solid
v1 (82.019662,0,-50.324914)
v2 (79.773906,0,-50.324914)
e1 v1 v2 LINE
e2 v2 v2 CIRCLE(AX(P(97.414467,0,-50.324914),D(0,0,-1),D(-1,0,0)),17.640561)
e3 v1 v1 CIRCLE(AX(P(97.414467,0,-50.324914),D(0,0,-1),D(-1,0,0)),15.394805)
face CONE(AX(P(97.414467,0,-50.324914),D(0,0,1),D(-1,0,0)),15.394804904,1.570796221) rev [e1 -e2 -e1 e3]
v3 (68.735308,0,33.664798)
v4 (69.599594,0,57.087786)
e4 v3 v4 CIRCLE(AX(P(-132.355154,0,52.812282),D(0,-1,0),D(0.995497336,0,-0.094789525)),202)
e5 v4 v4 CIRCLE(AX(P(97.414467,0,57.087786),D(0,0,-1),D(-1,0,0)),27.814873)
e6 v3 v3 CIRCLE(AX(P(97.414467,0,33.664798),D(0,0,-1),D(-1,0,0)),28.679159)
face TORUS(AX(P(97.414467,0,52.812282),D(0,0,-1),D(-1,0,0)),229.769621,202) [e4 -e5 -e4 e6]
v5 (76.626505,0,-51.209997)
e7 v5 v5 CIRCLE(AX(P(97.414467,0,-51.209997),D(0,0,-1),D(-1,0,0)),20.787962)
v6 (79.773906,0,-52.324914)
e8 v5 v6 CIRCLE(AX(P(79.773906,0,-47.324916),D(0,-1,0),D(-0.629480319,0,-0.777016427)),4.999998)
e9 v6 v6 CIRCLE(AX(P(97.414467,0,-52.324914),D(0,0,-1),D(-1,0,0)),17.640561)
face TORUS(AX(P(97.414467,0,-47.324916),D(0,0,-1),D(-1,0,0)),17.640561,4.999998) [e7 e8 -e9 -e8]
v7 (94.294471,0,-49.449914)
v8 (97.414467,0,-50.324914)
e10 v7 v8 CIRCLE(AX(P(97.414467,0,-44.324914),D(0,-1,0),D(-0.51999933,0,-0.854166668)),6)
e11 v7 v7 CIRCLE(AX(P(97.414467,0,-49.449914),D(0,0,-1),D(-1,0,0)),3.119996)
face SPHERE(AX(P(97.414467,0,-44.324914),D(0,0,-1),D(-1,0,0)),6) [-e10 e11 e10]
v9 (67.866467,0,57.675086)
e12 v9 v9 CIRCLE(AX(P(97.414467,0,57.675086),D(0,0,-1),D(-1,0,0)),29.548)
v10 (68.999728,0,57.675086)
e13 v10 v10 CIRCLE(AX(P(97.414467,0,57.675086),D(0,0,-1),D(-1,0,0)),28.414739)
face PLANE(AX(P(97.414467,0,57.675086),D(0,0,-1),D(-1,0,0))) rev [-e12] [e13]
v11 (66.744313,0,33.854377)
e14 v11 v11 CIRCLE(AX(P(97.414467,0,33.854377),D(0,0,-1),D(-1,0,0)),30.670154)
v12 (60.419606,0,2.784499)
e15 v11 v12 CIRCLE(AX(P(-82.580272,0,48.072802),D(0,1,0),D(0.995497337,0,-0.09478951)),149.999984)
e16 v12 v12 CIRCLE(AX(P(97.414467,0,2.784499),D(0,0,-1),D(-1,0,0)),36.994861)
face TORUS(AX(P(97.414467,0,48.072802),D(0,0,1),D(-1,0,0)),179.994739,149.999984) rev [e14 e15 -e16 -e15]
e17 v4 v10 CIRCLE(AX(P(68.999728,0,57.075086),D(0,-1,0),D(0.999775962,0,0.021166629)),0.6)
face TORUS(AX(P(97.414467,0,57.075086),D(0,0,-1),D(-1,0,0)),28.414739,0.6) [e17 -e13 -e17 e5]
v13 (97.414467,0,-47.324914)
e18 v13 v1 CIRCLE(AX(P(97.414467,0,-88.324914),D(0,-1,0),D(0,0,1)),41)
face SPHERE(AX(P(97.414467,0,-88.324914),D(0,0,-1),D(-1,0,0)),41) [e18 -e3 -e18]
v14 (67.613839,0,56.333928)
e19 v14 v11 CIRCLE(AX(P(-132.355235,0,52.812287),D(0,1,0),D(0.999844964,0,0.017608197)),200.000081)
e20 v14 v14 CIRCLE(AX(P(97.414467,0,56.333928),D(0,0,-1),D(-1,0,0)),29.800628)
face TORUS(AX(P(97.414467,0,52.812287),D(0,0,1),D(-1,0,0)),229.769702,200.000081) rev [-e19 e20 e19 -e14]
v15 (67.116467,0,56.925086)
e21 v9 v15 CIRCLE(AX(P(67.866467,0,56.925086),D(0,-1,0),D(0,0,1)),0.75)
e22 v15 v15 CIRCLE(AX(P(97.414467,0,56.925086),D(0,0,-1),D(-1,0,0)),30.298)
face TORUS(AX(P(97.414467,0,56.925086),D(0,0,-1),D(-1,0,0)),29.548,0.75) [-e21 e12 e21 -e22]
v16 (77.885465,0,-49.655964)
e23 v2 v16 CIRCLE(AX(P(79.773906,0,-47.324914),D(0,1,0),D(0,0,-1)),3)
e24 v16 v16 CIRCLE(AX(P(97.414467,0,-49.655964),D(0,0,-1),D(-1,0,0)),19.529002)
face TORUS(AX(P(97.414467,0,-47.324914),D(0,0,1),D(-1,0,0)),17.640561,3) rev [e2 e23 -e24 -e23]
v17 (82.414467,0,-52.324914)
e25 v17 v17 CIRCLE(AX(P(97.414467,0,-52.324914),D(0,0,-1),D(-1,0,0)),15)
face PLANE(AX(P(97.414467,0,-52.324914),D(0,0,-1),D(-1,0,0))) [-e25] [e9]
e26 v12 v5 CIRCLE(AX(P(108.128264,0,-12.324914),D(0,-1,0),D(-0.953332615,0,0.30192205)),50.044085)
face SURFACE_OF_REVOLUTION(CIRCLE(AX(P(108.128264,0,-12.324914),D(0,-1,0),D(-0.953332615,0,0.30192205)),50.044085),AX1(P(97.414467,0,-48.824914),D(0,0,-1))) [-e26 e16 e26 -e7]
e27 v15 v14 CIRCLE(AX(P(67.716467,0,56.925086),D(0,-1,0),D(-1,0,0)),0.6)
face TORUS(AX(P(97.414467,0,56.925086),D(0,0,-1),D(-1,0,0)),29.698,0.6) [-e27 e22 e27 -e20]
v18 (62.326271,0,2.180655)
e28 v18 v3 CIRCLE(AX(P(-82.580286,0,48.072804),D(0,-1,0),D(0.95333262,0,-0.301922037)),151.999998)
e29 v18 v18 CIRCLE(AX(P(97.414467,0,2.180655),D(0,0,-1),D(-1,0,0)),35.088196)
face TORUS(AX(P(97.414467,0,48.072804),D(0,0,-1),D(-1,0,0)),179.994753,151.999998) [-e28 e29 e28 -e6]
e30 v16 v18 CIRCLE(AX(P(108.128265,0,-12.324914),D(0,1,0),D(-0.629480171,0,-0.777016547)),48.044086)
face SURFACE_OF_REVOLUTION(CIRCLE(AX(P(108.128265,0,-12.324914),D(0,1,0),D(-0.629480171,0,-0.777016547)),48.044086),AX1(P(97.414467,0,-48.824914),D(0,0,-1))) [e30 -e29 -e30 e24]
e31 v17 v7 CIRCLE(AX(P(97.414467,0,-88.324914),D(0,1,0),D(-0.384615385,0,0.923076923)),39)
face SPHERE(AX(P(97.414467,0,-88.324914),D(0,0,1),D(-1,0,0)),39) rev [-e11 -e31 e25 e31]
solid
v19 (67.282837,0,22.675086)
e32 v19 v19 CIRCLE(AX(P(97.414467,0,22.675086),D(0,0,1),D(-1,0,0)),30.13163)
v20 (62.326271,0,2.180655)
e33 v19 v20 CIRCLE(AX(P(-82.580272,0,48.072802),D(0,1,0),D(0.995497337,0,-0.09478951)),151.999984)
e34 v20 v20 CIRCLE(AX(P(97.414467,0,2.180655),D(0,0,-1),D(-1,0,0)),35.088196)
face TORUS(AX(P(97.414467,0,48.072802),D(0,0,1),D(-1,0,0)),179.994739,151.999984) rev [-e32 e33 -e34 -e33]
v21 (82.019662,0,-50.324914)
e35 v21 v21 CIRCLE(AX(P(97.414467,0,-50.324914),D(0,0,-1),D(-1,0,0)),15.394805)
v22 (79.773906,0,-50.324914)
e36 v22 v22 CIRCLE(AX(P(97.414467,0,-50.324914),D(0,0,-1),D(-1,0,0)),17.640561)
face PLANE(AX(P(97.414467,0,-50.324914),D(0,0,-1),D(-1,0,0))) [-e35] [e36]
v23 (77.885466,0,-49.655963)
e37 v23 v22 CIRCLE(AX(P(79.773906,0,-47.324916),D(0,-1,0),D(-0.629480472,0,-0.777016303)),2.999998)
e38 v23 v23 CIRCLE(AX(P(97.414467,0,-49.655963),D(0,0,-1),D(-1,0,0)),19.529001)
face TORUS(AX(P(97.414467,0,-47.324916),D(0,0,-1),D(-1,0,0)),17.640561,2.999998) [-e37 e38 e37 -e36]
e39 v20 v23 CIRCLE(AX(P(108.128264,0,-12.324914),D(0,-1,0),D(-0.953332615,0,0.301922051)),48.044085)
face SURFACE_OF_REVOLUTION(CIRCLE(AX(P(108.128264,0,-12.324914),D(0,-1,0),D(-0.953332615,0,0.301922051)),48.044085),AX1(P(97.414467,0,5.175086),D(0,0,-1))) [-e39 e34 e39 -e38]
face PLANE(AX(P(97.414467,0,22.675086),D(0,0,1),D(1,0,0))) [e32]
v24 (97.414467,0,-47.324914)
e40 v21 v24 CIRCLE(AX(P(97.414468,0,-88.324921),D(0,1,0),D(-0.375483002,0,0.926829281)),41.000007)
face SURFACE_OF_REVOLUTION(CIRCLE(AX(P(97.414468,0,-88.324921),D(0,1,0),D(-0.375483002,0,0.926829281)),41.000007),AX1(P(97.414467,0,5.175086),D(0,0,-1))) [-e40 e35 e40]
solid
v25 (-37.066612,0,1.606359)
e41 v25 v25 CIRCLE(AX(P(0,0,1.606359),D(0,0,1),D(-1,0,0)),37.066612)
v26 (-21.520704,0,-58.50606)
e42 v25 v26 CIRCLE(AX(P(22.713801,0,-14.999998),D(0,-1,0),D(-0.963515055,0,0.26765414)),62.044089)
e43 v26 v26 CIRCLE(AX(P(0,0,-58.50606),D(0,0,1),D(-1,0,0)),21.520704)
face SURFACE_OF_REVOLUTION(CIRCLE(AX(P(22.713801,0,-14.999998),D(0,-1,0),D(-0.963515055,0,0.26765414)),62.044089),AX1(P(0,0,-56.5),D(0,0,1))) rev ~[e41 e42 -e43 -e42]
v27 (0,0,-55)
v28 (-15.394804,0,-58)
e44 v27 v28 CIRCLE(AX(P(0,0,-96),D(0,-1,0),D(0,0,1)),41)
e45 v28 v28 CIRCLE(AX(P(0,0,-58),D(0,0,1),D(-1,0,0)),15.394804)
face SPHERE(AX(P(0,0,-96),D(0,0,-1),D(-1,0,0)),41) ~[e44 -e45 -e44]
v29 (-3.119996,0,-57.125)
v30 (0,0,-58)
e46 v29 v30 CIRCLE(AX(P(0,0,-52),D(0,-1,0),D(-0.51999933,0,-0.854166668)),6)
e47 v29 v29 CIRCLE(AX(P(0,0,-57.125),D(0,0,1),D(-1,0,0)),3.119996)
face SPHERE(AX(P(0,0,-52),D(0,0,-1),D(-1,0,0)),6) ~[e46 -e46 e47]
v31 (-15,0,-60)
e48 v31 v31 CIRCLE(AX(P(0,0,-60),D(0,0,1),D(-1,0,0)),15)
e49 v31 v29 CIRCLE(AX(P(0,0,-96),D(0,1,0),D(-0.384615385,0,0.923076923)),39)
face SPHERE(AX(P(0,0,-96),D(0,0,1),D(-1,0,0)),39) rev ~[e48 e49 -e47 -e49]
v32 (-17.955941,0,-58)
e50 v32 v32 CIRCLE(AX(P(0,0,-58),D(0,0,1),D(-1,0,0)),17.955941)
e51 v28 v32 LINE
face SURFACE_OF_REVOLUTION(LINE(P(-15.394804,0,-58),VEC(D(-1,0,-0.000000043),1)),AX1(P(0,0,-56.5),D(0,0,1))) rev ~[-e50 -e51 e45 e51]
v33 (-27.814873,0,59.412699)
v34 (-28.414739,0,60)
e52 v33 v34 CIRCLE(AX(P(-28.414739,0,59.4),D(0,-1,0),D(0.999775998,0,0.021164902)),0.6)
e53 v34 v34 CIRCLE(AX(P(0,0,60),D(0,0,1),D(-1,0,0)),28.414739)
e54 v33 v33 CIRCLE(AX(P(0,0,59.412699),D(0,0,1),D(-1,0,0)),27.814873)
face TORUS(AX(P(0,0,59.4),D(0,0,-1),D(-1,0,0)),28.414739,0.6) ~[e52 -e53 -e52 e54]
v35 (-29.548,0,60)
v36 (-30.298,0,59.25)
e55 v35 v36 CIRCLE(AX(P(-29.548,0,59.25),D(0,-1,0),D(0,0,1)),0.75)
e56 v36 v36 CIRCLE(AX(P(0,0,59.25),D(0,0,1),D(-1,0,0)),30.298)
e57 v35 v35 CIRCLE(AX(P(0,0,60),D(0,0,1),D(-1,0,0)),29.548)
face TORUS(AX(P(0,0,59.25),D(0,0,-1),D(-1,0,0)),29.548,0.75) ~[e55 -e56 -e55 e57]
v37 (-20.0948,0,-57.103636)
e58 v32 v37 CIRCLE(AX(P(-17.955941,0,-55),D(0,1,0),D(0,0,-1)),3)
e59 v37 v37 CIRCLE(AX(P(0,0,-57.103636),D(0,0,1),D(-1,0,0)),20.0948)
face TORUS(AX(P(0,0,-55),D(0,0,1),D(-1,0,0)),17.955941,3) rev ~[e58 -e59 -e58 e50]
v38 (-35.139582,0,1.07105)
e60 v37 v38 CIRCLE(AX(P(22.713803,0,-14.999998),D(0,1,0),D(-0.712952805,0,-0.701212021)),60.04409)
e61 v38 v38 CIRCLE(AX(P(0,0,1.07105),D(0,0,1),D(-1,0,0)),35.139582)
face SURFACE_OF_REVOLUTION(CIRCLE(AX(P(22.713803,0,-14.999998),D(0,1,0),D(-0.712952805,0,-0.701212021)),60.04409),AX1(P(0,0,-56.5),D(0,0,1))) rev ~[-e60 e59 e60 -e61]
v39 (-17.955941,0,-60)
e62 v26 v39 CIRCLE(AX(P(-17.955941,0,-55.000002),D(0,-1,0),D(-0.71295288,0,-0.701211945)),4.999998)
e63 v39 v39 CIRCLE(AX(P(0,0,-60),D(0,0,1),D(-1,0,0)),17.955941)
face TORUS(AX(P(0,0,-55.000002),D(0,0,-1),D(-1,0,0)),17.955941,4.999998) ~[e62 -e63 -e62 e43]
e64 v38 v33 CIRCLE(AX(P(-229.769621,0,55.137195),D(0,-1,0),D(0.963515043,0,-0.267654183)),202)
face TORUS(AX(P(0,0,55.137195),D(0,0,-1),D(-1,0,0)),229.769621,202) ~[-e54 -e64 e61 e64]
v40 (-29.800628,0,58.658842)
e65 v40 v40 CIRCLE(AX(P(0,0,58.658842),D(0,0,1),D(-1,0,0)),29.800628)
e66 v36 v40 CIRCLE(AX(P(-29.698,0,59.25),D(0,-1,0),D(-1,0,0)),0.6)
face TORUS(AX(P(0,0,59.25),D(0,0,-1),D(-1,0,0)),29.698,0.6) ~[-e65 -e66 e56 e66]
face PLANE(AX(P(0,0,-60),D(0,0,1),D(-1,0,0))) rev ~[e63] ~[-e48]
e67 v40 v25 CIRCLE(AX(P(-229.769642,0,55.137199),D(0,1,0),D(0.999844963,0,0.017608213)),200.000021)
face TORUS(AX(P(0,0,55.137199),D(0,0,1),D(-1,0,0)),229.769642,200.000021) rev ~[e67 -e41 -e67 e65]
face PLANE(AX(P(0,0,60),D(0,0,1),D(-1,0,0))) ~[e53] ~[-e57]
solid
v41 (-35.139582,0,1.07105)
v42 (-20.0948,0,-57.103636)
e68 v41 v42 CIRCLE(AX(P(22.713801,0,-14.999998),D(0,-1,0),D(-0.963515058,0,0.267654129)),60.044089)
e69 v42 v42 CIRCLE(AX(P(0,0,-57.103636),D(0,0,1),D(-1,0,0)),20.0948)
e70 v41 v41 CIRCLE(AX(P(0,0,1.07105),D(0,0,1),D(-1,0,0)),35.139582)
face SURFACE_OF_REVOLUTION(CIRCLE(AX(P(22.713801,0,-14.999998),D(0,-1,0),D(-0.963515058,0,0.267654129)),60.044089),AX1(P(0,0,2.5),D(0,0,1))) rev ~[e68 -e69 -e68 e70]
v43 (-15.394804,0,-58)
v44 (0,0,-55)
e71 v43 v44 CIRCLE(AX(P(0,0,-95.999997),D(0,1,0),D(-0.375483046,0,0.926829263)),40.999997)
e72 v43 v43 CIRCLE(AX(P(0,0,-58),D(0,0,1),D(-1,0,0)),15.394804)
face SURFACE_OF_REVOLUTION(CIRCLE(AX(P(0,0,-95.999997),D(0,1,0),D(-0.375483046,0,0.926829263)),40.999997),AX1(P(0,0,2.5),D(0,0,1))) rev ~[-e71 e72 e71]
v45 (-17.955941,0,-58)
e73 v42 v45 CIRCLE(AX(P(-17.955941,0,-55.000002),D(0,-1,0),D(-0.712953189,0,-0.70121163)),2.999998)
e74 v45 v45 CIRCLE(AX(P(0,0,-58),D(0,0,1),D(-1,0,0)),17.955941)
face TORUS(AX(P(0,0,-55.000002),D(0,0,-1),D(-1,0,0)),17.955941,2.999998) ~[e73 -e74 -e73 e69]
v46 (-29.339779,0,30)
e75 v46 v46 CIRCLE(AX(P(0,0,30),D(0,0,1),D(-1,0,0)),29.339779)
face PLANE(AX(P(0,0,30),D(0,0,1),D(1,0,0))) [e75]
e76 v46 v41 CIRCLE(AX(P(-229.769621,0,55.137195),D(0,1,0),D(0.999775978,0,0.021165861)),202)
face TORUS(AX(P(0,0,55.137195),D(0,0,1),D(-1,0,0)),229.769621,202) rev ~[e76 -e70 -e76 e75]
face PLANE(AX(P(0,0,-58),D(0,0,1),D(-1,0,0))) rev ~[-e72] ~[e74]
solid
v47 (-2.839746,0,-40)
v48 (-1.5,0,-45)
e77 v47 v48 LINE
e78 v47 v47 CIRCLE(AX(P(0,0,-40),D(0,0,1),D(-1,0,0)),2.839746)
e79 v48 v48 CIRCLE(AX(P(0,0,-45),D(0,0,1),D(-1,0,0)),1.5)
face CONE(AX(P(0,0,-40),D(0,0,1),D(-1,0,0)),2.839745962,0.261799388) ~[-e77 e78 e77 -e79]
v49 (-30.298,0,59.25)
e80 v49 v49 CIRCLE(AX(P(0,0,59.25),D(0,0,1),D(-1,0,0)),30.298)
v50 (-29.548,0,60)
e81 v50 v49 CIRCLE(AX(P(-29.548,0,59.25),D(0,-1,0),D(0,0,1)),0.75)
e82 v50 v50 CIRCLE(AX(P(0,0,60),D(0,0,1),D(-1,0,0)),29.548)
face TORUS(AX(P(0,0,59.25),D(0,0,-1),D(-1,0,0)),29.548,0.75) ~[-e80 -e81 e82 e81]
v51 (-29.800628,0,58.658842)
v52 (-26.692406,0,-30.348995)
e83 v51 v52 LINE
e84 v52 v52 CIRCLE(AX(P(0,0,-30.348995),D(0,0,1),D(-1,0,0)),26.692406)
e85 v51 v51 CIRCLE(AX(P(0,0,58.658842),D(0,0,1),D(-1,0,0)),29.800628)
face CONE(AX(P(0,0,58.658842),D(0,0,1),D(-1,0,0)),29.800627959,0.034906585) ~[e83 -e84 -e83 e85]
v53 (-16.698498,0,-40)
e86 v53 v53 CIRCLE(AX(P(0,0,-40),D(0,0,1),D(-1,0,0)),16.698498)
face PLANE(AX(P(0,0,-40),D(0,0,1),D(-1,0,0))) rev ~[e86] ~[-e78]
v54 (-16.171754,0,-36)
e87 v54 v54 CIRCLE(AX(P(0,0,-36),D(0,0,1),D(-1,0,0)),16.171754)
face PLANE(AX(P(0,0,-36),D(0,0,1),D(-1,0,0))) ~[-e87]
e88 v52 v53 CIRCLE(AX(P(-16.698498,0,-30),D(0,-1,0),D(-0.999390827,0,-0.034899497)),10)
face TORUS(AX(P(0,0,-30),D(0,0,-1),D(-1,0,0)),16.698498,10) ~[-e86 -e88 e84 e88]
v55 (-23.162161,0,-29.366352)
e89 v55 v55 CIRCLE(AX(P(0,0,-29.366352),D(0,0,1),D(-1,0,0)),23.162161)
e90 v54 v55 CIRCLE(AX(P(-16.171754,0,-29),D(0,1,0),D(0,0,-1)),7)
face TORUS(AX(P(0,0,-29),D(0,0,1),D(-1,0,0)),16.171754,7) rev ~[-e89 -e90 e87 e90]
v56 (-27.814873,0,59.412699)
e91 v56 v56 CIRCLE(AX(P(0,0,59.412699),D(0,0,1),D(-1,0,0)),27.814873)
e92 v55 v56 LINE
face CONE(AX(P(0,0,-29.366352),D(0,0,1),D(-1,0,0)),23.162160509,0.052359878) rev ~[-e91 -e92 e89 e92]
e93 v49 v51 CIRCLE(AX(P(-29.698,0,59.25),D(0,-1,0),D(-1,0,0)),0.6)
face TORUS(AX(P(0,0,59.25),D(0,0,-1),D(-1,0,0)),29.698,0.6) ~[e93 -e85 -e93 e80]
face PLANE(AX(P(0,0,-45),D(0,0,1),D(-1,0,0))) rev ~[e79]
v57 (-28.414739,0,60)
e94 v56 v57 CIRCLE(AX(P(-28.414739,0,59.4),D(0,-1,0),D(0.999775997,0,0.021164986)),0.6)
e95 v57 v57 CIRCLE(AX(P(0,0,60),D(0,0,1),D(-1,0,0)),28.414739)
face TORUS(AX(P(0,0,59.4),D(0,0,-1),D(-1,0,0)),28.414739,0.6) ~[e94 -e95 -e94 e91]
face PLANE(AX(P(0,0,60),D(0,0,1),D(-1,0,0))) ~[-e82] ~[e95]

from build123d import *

# Parameters (mm, degrees)
F3_R      = 125.9850186155
F4_DEPTH  = 30
F12_R     = 66.2325488452
F13_DEPTH = 35


# Not quite as in the source:
# - ends of sketch curves that miss each other by under 0.0002 mm in the source are joined


with BuildPart() as f2:
    # F1 (on Front) → F2 (revolve)
    with BuildSketch(Plane.XZ):
        with BuildLine():
            ThreePointArc((-27.8148734311, 59.4126989909), (-29.3430504586, 29.9739316777), (-35.1395822774, 1.0710500771))
            ThreePointArc((-35.1395822774, 1.0710500771), (-35.4177932294, -30.0336371057), (-20.0947995033, -57.1036355115))
            ThreePointArc((-20.0947995033, -57.1036355115), (-19.1154867702, -57.7668490394), (-17.955941, -58))
            Line((-17.955941, -58), (-15.394804, -58))
            ThreePointArc((-15.394804, -58), (-7.8421934259, -55.7569881561), (0, -55))
            Line((0, -55), (0, 60))
            Line((0, 60), (-28.414739, 60))
            ThreePointArc((-28.414739, 60), (-27.9949887141, 59.8287303318), (-27.8148734311, 59.4126989909))
        make_face()
    revolve(axis=Axis((0, 0, 2.5), (0, 0, 1)))

    # F3 (on face) → F4 (cut)
    with BuildSketch(Plane.XY.offset(60)):
        Circle(F3_R)
    extrude(amount=-F4_DEPTH, mode=Mode.SUBTRACT)


with BuildPart() as f6:
    # F5 (on Front) → F6 (revolve)
    with BuildSketch(Plane.XZ):
        with BuildLine():
            ThreePointArc((-35.1395822774, 1.0710500771), (-29.3430504586, 29.9739316777), (-27.8148734311, 59.4126989909))
            ThreePointArc((-27.8148734311, 59.4126989909), (-27.9949887141, 59.8287303318), (-28.414739, 60))
            Line((-28.414739, 60), (-29.548, 60))
            ThreePointArc((-29.548, 60), (-30.0783300859, 59.7803300859), (-30.298, 59.25))
            ThreePointArc((-30.298, 59.25), (-30.1571169652, 58.8637208104), (-29.800627959, 58.6588422359))
            ThreePointArc((-29.800627959, 58.6588422359), (-31.3721118802, 29.8700547766), (-37.0666121939, 1.6063590539))
            ThreePointArc((-37.0666121939, 1.6063590539), (-37.3540901939, -30.5343906031), (-21.5207043341, -58.506060345))
            ThreePointArc((-21.5207043341, -58.506060345), (-19.8885166315, -59.611415339), (-17.955941, -60))
            Line((-17.955941, -60), (-15, -60))
            ThreePointArc((-15, -60), (-9.1733292762, -58.0941952995), (-3.119996, -57.1250000005))
            ThreePointArc((-3.119996, -57.1250000005), (-1.6201851772, -57.7771100034), (0, -58))
            Line((0, -58), (0, -55))
            ThreePointArc((0, -55), (-7.8421934259, -55.7569881561), (-15.3948040449, -57.9999998892))
            Line((-15.3948040449, -57.9999998892), (-17.955941, -58))
            ThreePointArc((-17.955941, -58), (-19.1154867702, -57.7668490394), (-20.0947997335, -57.1036357379))
            ThreePointArc((-20.0947997335, -57.1036357379), (-35.4177932294, -30.0336371057), (-35.1395822774, 1.0710500771))
        make_face()
    revolve(axis=Axis((0, 0, -56.5), (0, 0, 1)))


with BuildPart() as f8:
    # F7 (on Front) → F8 (revolve)
    with BuildSketch(Plane.XZ):
        with BuildLine():
            Line((-23.1621605088, -29.3663516937), (-27.814873402, 59.4126989915))
            ThreePointArc((-27.814873402, 59.4126989915), (-27.9949887141, 59.8287303318), (-28.414739, 60))
            Line((-28.414739, 60), (-29.548, 60))
            ThreePointArc((-29.548, 60), (-30.0783300859, 59.7803300859), (-30.298, 59.25))
            ThreePointArc((-30.298, 59.25), (-30.1571169652, 58.8637208104), (-29.800627959, 58.6588422359))
            Line((-29.800627959, 58.6588422359), (-26.6924057931, -30.348994967))
            ThreePointArc((-26.6924057931, -30.348994967), (-23.6450812275, -37.1933980034), (-16.6984975229, -40))
            Line((-16.6984975229, -40), (-2.8397459622, -40))
            Line((-2.8397459622, -40), (-1.5, -45))
            Line((-1.5, -45), (0, -45))
            Line((0, -45), (0, -40))
            Line((0, -40), (0, -36))
            Line((0, -36), (-16.1717537655, -36))
            ThreePointArc((-16.1717537655, -36), (-20.9902357953, -34.0776205971), (-23.1621605088, -29.3663516937))
        make_face()
    revolve(axis=Axis((0, 0, -38), (0, 0, 1)))


with BuildPart() as f11:
    # F10 (on Front) → F11 (revolve)
    with BuildSketch(Plane.XZ):
        with BuildLine():
            ThreePointArc((68.999728, 57.675086), (69.4194779288, 57.5038166816), (69.5995935768, 57.087785991))
            ThreePointArc((69.5995935768, 57.087785991), (69.5074708351, 45.3637455867), (68.7353078746, 33.6647980119))
            ThreePointArc((68.7353078746, 33.6647980119), (66.3650176206, 17.7529077236), (62.3262707654, 2.1806550743))
            ThreePointArc((62.3262707654, 2.1806550743), (62.1123827267, -26.1369657711), (77.8854656516, -49.65596343))
            ThreePointArc((77.8854656516, -49.65596343), (78.7721946927, -50.1527355037), (79.773906, -50.324914))
            Line((79.773906, -50.324914), (82.019662, -50.324914))
            ThreePointArc((82.019662, -50.324914), (89.5722731193, -48.0819022447), (97.414467, -47.324914))
            Line((97.414467, -47.324914), (97.414467, 57.675086))
            Line((97.414467, 57.675086), (68.999728, 57.675086))
        make_face()
    revolve(axis=Axis((97.414467, 0, 5.175086), (0, 0, -1)))

    # F12 (on face) → F13 (cut)
    with BuildSketch(Plane.XY.offset(57.675086)):
        with Locations((97.414467, 0)):
            Circle(F12_R)
    extrude(amount=-F13_DEPTH, mode=Mode.SUBTRACT)


with BuildPart() as f15:
    # F14 (on Front) → F15 (revolve)
    with BuildSketch(Plane.XZ):
        with BuildLine():
            ThreePointArc((68.7353078746, 33.6647980119), (69.5074708351, 45.3637455867), (69.5995935689, 57.0877859909))
            ThreePointArc((69.5995935689, 57.0877859909), (69.4194779288, 57.5038166816), (68.999728, 57.675086))
            Line((68.999728, 57.675086), (67.866467, 57.675086))
            ThreePointArc((67.866467, 57.675086), (67.3361369141, 57.4554160859), (67.116467, 56.925086))
            ThreePointArc((67.116467, 56.925086), (67.2573499798, 56.5388068759), (67.6138388724, 56.3339282652))
            ThreePointArc((67.6138388724, 56.3339282652), (67.4953938268, 45.0819176273), (66.7443132039, 33.8543770758))
            ThreePointArc((66.7443132039, 33.8543770758), (64.4052109803, 18.1518537511), (60.4196055267, 2.7844991499))
            ThreePointArc((60.4196055267, 2.7844991499), (60.1968137028, -26.7119399572), (76.6265054701, -51.2099966541))
            ThreePointArc((76.6265054701, -51.2099966541), (78.1043872534, -52.0379498746), (79.773906, -52.324914))
            Line((79.773906, -52.324914), (82.414467, -52.324914))
            ThreePointArc((82.414467, -52.324914), (88.2411377238, -50.4191092995), (94.294471, -49.4499140005))
            ThreePointArc((94.294471, -49.4499140005), (95.7942818228, -50.1020240034), (97.414467, -50.324914))
            Line((97.414467, -50.324914), (97.414467, -47.324914))
            ThreePointArc((97.414467, -47.324914), (89.5722731193, -48.0819022447), (82.0196620961, -50.3249142372))
            Line((82.0196620961, -50.3249142372), (79.773906, -50.324914))
            ThreePointArc((79.773906, -50.324914), (78.7721946927, -50.1527355037), (77.8854654832, -49.6559636379))
            ThreePointArc((77.8854654832, -49.6559636379), (62.1123827267, -26.1369657711), (62.3262709137, 2.1806550273))
            ThreePointArc((62.3262709137, 2.1806550273), (66.3650176206, 17.7529077236), (68.7353078746, 33.6647980119))
        make_face()
    revolve(axis=Axis((97.414467, 0, -48.824914), (0, 0, -1)))


solid = Compound([f2.part, f6.part, f8.part, f11.part, f15.part])
